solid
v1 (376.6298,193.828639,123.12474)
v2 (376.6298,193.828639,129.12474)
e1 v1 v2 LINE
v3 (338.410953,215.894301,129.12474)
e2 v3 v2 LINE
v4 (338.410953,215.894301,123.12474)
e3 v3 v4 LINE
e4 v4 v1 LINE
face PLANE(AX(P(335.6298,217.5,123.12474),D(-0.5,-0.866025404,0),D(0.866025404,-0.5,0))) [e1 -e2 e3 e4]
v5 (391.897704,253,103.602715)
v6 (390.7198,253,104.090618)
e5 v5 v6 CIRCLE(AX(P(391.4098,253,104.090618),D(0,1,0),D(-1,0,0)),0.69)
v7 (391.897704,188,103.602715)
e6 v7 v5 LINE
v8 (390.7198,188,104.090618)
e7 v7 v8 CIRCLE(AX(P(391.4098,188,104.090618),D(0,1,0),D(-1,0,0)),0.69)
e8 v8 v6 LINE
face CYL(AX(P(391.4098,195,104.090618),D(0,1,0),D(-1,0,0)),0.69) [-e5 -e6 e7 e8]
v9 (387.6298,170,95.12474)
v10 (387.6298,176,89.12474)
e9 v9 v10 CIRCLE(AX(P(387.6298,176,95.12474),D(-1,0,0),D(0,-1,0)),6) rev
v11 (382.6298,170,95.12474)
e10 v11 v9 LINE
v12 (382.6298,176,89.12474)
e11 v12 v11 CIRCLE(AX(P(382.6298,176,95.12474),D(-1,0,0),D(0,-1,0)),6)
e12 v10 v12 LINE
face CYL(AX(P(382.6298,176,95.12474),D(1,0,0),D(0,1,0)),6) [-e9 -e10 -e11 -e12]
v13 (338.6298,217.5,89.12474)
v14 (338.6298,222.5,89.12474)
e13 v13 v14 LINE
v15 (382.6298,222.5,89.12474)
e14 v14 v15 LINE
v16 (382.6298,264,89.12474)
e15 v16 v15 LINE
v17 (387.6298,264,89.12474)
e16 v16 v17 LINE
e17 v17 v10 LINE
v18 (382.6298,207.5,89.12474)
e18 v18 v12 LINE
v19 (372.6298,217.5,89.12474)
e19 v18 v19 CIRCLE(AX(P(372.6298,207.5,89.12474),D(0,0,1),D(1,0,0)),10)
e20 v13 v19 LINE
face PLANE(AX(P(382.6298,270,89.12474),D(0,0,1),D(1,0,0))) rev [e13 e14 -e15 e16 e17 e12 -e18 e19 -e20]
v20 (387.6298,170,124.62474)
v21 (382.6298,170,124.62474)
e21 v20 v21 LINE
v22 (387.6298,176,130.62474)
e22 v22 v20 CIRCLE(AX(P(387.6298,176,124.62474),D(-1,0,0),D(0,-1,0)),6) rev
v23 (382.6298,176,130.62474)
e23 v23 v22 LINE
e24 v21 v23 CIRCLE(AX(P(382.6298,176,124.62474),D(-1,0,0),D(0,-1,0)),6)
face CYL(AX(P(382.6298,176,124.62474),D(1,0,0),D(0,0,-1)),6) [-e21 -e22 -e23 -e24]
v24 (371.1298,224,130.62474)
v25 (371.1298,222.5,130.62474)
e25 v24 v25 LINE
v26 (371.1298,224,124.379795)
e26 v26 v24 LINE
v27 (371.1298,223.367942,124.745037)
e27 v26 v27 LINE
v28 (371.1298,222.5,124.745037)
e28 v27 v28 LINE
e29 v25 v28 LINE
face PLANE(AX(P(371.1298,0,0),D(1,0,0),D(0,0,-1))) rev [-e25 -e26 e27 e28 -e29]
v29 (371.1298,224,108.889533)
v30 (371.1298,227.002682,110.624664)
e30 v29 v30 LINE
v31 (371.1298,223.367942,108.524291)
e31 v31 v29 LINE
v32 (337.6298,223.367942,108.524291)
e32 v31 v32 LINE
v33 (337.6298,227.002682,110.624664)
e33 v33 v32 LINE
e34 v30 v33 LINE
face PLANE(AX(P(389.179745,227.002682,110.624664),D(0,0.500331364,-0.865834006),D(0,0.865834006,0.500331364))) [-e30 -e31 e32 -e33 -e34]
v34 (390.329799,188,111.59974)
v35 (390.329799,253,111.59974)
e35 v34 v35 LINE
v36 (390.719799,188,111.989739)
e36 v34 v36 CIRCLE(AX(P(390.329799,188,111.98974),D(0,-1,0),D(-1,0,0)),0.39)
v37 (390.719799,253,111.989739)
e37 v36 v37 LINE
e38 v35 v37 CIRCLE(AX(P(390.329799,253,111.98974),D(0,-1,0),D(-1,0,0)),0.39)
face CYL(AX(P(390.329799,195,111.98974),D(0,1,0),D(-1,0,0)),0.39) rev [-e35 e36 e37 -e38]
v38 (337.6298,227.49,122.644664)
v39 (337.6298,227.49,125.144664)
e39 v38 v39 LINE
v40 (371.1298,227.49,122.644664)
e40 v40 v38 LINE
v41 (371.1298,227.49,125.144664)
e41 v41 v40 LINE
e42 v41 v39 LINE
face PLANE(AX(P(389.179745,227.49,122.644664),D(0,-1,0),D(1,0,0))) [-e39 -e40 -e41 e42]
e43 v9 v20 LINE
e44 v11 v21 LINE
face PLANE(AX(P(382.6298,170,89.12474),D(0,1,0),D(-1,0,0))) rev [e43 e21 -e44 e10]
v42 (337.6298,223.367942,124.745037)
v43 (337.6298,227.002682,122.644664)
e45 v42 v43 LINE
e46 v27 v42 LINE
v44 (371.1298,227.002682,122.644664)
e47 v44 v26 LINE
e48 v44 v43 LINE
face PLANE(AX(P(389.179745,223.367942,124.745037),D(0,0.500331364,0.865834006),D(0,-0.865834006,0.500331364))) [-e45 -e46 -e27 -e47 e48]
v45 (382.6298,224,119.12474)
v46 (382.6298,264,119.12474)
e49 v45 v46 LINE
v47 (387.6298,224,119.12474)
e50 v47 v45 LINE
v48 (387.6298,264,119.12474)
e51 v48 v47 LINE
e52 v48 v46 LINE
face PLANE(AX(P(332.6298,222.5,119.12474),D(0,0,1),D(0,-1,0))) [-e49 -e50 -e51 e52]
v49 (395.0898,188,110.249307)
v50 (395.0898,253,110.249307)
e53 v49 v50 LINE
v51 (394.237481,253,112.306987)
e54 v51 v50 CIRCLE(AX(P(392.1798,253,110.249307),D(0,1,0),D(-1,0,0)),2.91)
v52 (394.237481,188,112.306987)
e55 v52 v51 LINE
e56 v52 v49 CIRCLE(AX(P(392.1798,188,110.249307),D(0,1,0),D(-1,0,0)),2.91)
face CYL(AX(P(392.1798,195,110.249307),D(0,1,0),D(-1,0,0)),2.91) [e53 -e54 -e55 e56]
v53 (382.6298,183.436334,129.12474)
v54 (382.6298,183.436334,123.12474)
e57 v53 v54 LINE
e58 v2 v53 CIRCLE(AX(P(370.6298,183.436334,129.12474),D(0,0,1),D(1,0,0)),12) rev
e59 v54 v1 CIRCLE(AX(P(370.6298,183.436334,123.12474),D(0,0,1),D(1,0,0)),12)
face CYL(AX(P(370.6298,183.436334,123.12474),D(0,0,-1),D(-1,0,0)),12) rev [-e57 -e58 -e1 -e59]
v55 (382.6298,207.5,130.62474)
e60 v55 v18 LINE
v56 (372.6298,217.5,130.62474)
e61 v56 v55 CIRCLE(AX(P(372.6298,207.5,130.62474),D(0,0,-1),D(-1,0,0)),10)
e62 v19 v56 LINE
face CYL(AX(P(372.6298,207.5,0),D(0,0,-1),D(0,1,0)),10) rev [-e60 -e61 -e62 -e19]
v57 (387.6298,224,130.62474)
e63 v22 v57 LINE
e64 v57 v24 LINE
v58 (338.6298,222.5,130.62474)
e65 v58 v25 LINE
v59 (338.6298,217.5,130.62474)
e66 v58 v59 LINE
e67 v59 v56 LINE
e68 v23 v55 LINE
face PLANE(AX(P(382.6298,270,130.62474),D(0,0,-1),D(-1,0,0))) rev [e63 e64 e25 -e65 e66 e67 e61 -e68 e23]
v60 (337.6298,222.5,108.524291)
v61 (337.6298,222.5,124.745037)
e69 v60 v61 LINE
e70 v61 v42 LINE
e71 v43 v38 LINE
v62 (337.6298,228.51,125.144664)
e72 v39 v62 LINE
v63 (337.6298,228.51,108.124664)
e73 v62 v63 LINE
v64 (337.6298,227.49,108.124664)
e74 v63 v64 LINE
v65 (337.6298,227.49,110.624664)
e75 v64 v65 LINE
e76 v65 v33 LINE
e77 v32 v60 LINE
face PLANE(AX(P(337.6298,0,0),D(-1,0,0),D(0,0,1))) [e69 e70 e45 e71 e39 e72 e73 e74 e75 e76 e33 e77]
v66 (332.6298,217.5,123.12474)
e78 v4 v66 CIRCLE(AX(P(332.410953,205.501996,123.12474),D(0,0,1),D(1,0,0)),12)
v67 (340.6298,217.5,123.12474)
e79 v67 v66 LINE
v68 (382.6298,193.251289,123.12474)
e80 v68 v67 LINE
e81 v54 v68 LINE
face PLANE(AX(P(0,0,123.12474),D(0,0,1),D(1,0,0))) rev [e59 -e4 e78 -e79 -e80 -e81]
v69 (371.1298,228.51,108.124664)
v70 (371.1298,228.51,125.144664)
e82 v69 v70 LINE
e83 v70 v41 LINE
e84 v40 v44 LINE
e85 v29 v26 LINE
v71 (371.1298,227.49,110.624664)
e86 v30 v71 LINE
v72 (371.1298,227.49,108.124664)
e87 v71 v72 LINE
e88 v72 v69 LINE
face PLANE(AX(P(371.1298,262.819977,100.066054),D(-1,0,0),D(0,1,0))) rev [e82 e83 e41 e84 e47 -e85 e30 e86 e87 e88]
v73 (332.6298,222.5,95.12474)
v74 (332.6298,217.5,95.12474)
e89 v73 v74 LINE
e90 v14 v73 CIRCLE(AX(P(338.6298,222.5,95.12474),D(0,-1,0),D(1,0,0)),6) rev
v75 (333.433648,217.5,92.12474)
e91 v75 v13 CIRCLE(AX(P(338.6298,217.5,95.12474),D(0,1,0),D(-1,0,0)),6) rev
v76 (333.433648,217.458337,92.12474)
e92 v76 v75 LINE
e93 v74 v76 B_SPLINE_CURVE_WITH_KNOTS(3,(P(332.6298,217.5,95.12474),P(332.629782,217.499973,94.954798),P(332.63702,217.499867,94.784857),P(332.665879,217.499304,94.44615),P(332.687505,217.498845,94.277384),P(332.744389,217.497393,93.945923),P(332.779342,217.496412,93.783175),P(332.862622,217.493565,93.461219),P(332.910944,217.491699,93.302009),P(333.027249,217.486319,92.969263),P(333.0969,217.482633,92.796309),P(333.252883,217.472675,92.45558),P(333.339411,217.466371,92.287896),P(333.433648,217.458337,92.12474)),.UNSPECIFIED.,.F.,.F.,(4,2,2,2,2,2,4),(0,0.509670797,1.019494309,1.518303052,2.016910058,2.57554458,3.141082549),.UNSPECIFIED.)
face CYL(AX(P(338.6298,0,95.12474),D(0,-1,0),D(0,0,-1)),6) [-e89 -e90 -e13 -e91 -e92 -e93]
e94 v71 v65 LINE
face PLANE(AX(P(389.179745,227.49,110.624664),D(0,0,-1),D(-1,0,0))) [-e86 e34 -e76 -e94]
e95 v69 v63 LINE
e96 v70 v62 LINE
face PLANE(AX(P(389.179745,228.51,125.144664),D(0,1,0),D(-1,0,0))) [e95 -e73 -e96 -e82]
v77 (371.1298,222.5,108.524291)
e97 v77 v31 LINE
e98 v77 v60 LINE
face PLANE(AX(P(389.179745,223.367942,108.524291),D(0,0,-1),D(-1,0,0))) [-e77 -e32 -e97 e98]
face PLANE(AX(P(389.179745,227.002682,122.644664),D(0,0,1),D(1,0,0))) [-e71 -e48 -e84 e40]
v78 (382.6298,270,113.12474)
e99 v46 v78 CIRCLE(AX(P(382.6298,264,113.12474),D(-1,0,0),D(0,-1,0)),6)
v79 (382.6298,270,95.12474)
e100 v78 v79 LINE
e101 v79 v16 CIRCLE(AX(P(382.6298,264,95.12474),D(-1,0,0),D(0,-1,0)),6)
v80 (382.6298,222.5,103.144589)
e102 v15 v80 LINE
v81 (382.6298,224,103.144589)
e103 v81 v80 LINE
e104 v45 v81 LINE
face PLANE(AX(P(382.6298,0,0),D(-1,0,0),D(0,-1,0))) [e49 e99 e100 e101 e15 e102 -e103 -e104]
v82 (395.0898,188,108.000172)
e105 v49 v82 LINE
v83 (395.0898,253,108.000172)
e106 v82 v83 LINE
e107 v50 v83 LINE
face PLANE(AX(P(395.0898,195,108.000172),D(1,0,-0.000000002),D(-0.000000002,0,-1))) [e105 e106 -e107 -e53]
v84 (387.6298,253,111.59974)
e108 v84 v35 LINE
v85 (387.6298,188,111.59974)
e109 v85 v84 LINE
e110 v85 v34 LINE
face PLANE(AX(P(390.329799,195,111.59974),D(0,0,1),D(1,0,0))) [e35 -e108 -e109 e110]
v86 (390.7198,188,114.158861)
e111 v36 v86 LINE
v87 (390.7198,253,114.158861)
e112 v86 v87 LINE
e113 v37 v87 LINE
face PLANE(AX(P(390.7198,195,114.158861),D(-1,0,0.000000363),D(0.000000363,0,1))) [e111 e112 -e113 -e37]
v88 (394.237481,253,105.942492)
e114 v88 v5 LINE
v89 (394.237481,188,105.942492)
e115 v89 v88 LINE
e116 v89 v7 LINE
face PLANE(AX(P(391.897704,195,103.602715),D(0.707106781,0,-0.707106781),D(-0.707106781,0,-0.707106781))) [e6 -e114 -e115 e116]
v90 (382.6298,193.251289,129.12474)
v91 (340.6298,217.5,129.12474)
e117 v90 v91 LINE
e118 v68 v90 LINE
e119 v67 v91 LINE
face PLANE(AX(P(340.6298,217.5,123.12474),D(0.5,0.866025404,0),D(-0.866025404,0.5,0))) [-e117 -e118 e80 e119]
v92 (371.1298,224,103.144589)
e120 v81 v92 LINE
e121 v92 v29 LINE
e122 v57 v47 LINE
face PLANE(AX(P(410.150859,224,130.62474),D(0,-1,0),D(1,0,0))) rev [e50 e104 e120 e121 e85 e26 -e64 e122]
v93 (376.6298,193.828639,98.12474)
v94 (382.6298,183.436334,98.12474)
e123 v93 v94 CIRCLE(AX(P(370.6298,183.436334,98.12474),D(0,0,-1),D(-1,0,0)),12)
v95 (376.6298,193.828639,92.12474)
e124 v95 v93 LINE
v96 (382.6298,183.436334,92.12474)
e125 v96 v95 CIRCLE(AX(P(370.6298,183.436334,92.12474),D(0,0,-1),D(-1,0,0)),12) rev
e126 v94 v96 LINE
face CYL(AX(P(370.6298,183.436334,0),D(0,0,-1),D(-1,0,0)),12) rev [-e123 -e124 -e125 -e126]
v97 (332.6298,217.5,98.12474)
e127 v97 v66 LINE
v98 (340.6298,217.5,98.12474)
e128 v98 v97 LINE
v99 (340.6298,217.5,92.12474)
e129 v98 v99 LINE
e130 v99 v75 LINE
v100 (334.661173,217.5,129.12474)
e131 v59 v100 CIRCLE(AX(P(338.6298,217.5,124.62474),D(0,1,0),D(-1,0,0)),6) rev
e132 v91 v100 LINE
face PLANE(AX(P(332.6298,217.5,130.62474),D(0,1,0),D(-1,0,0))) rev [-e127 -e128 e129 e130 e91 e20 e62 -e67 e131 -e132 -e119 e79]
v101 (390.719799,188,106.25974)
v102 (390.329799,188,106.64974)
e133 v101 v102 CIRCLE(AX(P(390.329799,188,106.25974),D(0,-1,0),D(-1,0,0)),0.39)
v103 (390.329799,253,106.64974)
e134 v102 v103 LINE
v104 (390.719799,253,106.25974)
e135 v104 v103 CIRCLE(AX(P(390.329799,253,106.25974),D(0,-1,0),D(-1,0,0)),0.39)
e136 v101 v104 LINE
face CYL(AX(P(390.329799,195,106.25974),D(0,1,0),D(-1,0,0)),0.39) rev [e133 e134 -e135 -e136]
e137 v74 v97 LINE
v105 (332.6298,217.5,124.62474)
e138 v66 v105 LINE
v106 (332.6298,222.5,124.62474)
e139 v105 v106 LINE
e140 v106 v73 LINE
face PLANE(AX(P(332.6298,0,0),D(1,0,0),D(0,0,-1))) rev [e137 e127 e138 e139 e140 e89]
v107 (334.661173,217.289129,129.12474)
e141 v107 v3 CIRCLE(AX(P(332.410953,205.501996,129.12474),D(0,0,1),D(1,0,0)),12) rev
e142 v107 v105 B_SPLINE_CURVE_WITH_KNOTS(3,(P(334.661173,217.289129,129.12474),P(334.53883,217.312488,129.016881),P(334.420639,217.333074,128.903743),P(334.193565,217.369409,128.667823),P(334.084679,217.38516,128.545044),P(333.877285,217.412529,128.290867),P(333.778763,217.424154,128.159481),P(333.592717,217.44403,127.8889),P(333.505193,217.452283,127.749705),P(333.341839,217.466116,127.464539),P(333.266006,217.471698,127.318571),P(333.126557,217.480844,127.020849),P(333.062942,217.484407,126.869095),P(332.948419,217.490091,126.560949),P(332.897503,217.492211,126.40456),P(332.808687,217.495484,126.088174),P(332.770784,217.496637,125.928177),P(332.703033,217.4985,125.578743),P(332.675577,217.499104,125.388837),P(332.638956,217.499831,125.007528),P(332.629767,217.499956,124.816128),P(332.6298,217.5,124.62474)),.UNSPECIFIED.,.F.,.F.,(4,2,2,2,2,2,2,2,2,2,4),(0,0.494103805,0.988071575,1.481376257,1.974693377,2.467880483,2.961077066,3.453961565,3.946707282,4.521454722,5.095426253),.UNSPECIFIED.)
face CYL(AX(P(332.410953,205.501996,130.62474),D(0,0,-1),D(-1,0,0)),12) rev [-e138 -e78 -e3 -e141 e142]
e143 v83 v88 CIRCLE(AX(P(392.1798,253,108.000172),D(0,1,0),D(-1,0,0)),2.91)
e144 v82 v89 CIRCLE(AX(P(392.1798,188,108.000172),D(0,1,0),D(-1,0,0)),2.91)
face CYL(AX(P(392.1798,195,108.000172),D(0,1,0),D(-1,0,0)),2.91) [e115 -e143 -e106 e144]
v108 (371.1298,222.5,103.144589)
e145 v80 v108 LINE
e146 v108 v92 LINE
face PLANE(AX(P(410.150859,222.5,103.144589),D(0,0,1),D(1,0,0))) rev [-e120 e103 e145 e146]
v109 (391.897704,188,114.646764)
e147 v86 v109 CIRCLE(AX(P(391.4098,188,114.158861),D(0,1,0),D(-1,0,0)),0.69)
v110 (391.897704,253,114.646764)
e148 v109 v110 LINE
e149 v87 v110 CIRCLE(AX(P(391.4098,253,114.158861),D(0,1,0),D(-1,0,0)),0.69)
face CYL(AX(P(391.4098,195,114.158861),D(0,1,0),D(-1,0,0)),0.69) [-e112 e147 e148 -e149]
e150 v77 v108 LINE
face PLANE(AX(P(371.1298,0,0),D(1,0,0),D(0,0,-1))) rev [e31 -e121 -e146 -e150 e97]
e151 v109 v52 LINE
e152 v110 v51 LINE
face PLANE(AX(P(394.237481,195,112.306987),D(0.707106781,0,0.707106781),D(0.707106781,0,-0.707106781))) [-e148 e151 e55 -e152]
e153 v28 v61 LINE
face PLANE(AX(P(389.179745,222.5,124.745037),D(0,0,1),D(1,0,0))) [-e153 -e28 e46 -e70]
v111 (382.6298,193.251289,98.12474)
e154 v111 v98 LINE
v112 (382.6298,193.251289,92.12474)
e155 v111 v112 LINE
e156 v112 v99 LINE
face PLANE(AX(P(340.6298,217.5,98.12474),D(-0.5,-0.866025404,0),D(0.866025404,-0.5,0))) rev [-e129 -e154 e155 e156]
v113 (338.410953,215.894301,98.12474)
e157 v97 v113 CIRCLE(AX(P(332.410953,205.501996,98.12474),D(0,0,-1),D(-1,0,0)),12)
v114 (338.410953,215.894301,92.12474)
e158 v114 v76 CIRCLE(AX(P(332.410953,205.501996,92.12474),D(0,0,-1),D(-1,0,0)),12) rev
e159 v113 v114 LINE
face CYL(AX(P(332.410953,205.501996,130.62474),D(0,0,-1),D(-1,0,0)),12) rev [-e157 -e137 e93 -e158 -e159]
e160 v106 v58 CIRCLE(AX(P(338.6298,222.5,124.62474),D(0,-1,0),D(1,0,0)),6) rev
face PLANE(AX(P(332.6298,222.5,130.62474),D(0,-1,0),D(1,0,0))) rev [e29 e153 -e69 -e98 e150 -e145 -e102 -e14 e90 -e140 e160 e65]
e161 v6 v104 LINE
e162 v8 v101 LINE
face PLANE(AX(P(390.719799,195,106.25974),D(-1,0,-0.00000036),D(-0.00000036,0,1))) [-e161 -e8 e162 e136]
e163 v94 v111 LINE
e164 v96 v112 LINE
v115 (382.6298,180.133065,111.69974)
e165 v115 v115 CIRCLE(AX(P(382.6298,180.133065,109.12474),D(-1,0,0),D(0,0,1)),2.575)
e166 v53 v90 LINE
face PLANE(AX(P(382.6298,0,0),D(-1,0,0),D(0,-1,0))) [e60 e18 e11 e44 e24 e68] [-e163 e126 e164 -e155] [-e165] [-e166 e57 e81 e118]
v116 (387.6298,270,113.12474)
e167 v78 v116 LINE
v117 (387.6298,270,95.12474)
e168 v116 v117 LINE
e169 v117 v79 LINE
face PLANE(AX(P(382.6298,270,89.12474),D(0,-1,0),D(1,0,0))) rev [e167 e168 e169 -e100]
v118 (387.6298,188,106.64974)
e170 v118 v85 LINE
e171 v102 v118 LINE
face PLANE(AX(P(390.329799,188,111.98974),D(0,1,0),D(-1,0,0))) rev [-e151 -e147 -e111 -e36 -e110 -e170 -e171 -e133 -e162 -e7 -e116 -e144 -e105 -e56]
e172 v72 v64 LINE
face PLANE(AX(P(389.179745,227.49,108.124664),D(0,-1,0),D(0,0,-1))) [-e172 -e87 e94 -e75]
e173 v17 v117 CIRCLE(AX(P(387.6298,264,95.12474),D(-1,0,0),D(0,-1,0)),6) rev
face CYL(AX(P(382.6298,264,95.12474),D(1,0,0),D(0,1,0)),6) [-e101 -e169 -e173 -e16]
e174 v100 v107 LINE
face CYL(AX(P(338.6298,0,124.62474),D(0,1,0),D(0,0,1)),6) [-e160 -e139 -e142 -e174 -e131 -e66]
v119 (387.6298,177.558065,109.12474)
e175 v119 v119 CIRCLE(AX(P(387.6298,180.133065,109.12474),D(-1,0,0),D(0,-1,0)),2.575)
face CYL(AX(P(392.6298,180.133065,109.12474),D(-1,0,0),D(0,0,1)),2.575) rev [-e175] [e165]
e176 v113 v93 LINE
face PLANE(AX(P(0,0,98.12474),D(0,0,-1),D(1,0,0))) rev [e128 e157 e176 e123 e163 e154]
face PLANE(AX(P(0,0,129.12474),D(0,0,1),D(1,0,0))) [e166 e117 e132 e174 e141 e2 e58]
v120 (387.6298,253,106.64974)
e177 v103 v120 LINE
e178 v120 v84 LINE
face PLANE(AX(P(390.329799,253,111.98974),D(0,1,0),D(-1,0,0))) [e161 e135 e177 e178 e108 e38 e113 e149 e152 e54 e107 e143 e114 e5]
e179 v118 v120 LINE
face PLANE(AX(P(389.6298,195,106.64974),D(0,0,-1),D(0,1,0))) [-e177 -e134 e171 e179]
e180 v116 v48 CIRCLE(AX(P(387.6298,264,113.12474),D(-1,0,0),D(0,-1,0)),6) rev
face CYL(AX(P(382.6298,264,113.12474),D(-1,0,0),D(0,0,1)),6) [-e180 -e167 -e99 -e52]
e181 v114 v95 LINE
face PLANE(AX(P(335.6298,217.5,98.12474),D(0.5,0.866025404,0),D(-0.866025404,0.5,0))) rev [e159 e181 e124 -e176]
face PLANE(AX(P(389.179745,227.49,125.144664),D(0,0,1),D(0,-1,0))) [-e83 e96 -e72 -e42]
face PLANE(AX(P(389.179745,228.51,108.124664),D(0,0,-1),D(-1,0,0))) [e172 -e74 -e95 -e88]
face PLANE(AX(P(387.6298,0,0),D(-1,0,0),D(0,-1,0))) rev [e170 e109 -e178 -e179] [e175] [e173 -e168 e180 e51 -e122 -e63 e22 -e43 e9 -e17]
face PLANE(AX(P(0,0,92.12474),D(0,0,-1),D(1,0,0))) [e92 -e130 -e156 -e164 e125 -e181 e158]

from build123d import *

# Parameters (mm, degrees)
BOSS_EXTRUDE5_DEPTH  = 50
SKETCH11_W           = 41.5
SKETCH11_H           = 100
BOSS_EXTRUDE6_DEPTH  = 5
SKETCH12_W           = 41.5
SKETCH12_H           = 5
BOSS_EXTRUDE8_DEPTH  = 55
SKETCH13_W           = 11.5
SKETCH13_H           = 47.5
CUT_EXTRUDE1_DEPTH   = 55
BOSS_EXTRUDE9_DEPTH  = 6
FILLET7_R            = 12
FILLET7_OF_MIRROR1_R = 12
FILLET8_R            = 6
BOSS_EXTRUDE10_START = 8
BOSS_EXTRUDE10_DEPTH = 8
FILLET12_R           = 10
BOSS_EXTRUDE11_DEPTH = 57
SKETCH16_R           = 2.575
CUT_EXTRUDE2_DEPTH   = 10
SKETCH17_W           = 27.480150942
SKETCH17_H           = 1.5
BOSS_EXTRUDE12_DEPTH = 11.5
SKETCH18_W           = 11.5
SKETCH18_H           = 1.5
BOSS_EXTRUDE13_DEPTH = 5
BOSS_EXTRUDE14_START = -5
BOSS_EXTRUDE14_DEPTH = 33.5


with BuildPart() as part:
    # Sketch9 → Boss-Extrude5 (new body)
    with BuildSketch(Plane(origin=(0, 245, 0), x_dir=(1, 0, 0), z_dir=(0, 1, 0))):
        with BuildLine():
            Line((389.629800237, -111.599739584), (387.629800237, -111.599739584))
            Line((387.629800237, -111.599739584), (387.629800237, -106.649739584))
            Line((387.629800237, -106.649739584), (389.629800237, -106.649739584))
            Line((389.629800237, -106.649739584), (390.329799474, -106.649739584))
            ThreePointArc((390.329799474, -106.649739584), (390.605571069, -106.535511279), (390.719799474, -106.259739725))
            Line((390.719799474, -106.259739725), (390.719800256, -104.090618139))
            ThreePointArc((390.719800256, -104.090618139), (391.145748802, -103.453141463), (391.897703935, -103.602714709))
            Line((391.897703935, -103.602714709), (394.237480965, -105.942491739))
            ThreePointArc((394.237480965, -105.942491739), (394.868289671, -106.886563682), (395.089800232, -108.000172467))
            Line((395.089800232, -108.000172467), (395.089800237, -110.249306685))
            ThreePointArc((395.089800237, -110.249306685), (394.868289678, -111.362915477), (394.23748097, -112.306987424))
            Line((394.23748097, -112.306987424), (391.897703941, -114.646764454))
            ThreePointArc((391.897703941, -114.646764454), (391.145748809, -114.7963377), (390.719800262, -114.158861025))
            Line((390.719800262, -114.158861025), (390.719799474, -111.989739443))
            ThreePointArc((390.719799474, -111.989739443), (390.605571069, -111.71396789), (390.329799474, -111.599739584))
            Line((390.329799474, -111.599739584), (389.629800237, -111.599739584))
        make_face()
    extrude(amount=-BOSS_EXTRUDE5_DEPTH)

    # Sketch11 → Boss-Extrude6 (add)
    with BuildSketch(Plane.ZY.offset(-387.629800242)):
        with Locations((109.874739584, 220)):
            Rectangle(SKETCH11_W, SKETCH11_H)
    extrude(amount=BOSS_EXTRUDE6_DEPTH)

    # Sketch12 → Boss-Extrude8 (add)
    with BuildSketch(Plane.ZY.offset(-387.629800242)):
        with Locations((109.874739584, 220)):
            Rectangle(SKETCH12_W, SKETCH12_H)
    extrude(amount=BOSS_EXTRUDE8_DEPTH)

    # Sketch13 → Cut-Extrude1 (cut)
    with BuildSketch(Plane.ZY.offset(-387.629800242)):
        with Locations((124.874739584, 246.25)):
            Rectangle(SKETCH13_W, SKETCH13_H)
    extrude(amount=CUT_EXTRUDE1_DEPTH, mode=Mode.SUBTRACT)

    # Sketch15 → Boss-Extrude9 (add)
    with BuildSketch(Plane.XY.offset(129.124739584)):
        Polygon((335.629800242, 217.5), (382.629800242, 190.364537348), (382.629800242, 193.251288694), (340.629800242, 217.5), align=None)
    boss_extrude9 = extrude(amount=-BOSS_EXTRUDE9_DEPTH)

    # Fillet7
    # the kernel refuses this fillet: 12 mm, written as the material it adds along each edge
    with BuildSketch(Plane(origin=(335.629800242, 217.5, 129.124739584), x_dir=(-1, 0, 0), z_dir=(0, 0, -1))) as fillet7_piece_1:
        with BuildLine():
            CenterArc((3.218847051, -11.998004249), FILLET7_R, 91.044975628, 28.955024372)
            Line((-2.781152949, -1.605699404), (-2.901152949, -1.397853307))
            Line((-2.901152949, -1.397853307), (-0.12, 0.207846097))
            Line((-0.12, 0.207846097), (0, 0.24))
            ThreePointArc((0, 0.24), (1.5, 0.24), (2.995623059, 0.239960085))
            Line((2.995623059, 0.239960085), (3, 0))
        make_face()
    extrude(amount=6)
    with BuildSketch(Plane(origin=(382.629800242, 190.364537348, 129.124739584), x_dir=(0, -1, 0), z_dir=(0, 0, -1))) as fillet7_piece_2:
        with BuildLine():
            CenterArc((FILLET7_R * 0.57735026919, FILLET7_R), FILLET7_R, 210, 60)
            Line((-FILLET7_R * 0.288675134595, FILLET7_R * 0.5), (-FILLET7_R * 0.305995642671, FILLET7_R * 0.49))
            Line((-FILLET7_R * 0.305995642671, FILLET7_R * 0.49), (-FILLET7_R * 0.0115470053838, -FILLET7_R * 0.02))
            Line((-FILLET7_R * 0.0115470053838, -FILLET7_R * 0.02), (FILLET7_R * 0.57735026919, -FILLET7_R * 0.02))
            Line((FILLET7_R * 0.57735026919, -FILLET7_R * 0.02), (FILLET7_R * 0.57735026919, 0))
        make_face()
    extrude(amount=6)

    # Mirror1: Boss-Extrude9 across plane
    add(boss_extrude9.mirror(Plane.XY.offset(110.624739584)))

    # Fillet7 of Mirror1
    # the kernel refuses this fillet: 12 mm, written as the material it adds along each edge
    with BuildSketch(Plane(origin=(335.629800242, 217.5, 92.124739584), x_dir=(-1, 0, 0), z_dir=(0, 0, 1))) as fillet7_of_mirror1_piece_1:
        with BuildLine():
            CenterArc((3.218847051, 11.998004249), FILLET7_OF_MIRROR1_R, 240, 28.955024372)
            Line((-2.781152949, 1.605699404), (-2.901152949, 1.397853307))
            Line((-2.901152949, 1.397853307), (-0.12, -0.207846097))
            Line((-0.12, -0.207846097), (0, -0.24))
            ThreePointArc((0, -0.24), (1.5, -0.24), (2.995623059, -0.239960085))
            Line((2.995623059, -0.239960085), (3, 0))
        make_face()
    extrude(amount=6)
    with BuildSketch(Plane(origin=(382.629800242, 190.364537348, 92.124739584), x_dir=(0, -1, 0), z_dir=(0, 0, 1))) as fillet7_of_mirror1_piece_2:
        with BuildLine():
            CenterArc((FILLET7_OF_MIRROR1_R * 0.57735026919, -FILLET7_OF_MIRROR1_R), FILLET7_OF_MIRROR1_R, 90, 60)
            Line((-FILLET7_OF_MIRROR1_R * 0.288675134595, -FILLET7_OF_MIRROR1_R * 0.5), (-FILLET7_OF_MIRROR1_R * 0.305995642671, -FILLET7_OF_MIRROR1_R * 0.49))
            Line((-FILLET7_OF_MIRROR1_R * 0.305995642671, -FILLET7_OF_MIRROR1_R * 0.49), (-FILLET7_OF_MIRROR1_R * 0.0115470053838, FILLET7_OF_MIRROR1_R * 0.02))
            Line((-FILLET7_OF_MIRROR1_R * 0.0115470053838, FILLET7_OF_MIRROR1_R * 0.02), (FILLET7_OF_MIRROR1_R * 0.57735026919, FILLET7_OF_MIRROR1_R * 0.02))
            Line((FILLET7_OF_MIRROR1_R * 0.57735026919, FILLET7_OF_MIRROR1_R * 0.02), (FILLET7_OF_MIRROR1_R * 0.57735026919, 0))
        make_face()
    extrude(amount=6)

    # Fillet8
    # the kernel refuses this fillet: 6 mm, written as the material it takes off along each edge
    with BuildSketch(Plane(origin=(402.629800242, 270, 89.124739584), x_dir=(0, 0, 1), z_dir=(-1, 0, 0)), Plane(origin=(332.629800242, 237.5, 89.124739584), x_dir=(0, 0, 1), z_dir=(0, -1, 0)), Plane(origin=(402.629800242, 270, 119.124739584), x_dir=(0, -1, 0), z_dir=(-1, 0, 0))) as fillet8_piece_1:
        with BuildLine():
            CenterArc((FILLET8_R, -FILLET8_R), FILLET8_R, 90, 90)
            Line((0, -FILLET8_R), (0, 0))
            Line((0, 0), (FILLET8_R, 0))
        make_face()
    extrude(amount=35, mode=Mode.SUBTRACT)
    with BuildSketch(Plane(origin=(402.629800242, 170, 89.124739584), x_dir=(0, 0, 1), z_dir=(-1, 0, 0)), Plane(origin=(402.629800242, 170, 130.624739584), x_dir=(0, 1, 0), z_dir=(-1, 0, 0)), Plane(origin=(332.629800242, 202.5, 130.624739584), x_dir=(1, 0, 0), z_dir=(0, 1, 0))) as fillet8_piece_2:
        with BuildLine():
            CenterArc((FILLET8_R, FILLET8_R), FILLET8_R, 180, 90)
            Line((0, FILLET8_R), (0, 0))
            Line((0, 0), (FILLET8_R, 0))
        make_face()
    extrude(amount=35, mode=Mode.SUBTRACT)

    # Sketch9<2> → Boss-Extrude10 (add)
    with BuildSketch(Plane(origin=(0, 245, 0), x_dir=(1, 0, 0), z_dir=(0, 1, 0)).offset(BOSS_EXTRUDE10_START)):
        with BuildLine():
            Line((389.629800237, -111.599739584), (387.629800237, -111.599739584))
            Line((387.629800237, -111.599739584), (387.629800237, -106.649739584))
            Line((387.629800237, -106.649739584), (389.629800237, -106.649739584))
            Line((389.629800237, -106.649739584), (390.329799474, -106.649739584))
            ThreePointArc((390.329799474, -106.649739584), (390.605571069, -106.535511279), (390.719799474, -106.259739725))
            Line((390.719799474, -106.259739725), (390.719800256, -104.090618139))
            ThreePointArc((390.719800256, -104.090618139), (391.145748802, -103.453141463), (391.897703935, -103.602714709))
            Line((391.897703935, -103.602714709), (394.237480965, -105.942491739))
            ThreePointArc((394.237480965, -105.942491739), (394.868289671, -106.886563682), (395.089800232, -108.000172467))
            Line((395.089800232, -108.000172467), (395.089800237, -110.249306685))
            ThreePointArc((395.089800237, -110.249306685), (394.868289678, -111.362915477), (394.23748097, -112.306987424))
            Line((394.23748097, -112.306987424), (391.897703941, -114.646764454))
            ThreePointArc((391.897703941, -114.646764454), (391.145748809, -114.7963377), (390.719800262, -114.158861025))
            Line((390.719800262, -114.158861025), (390.719799474, -111.989739443))
            ThreePointArc((390.719799474, -111.989739443), (390.605571069, -111.71396789), (390.329799474, -111.599739584))
            Line((390.329799474, -111.599739584), (389.629800237, -111.599739584))
        make_face()
    extrude(amount=-BOSS_EXTRUDE10_DEPTH)

    # Fillet12
    fillet12_edges = [part.edges().sort_by_distance(p)[0] for p in [
        (382.629800242, 217.5, 109.874739584),
    ]]
    fillet(fillet12_edges, radius=FILLET12_R)

    # Sketch9<3> → Boss-Extrude11 (add)
    with BuildSketch(Plane(origin=(0, 245, 0), x_dir=(1, 0, 0), z_dir=(0, 1, 0))):
        with BuildLine():
            Line((389.629800237, -111.599739584), (387.629800237, -111.599739584))
            Line((387.629800237, -111.599739584), (387.629800237, -106.649739584))
            Line((387.629800237, -106.649739584), (389.629800237, -106.649739584))
            Line((389.629800237, -106.649739584), (390.329799474, -106.649739584))
            ThreePointArc((390.329799474, -106.649739584), (390.605571069, -106.535511279), (390.719799474, -106.259739725))
            Line((390.719799474, -106.259739725), (390.719800256, -104.090618139))
            ThreePointArc((390.719800256, -104.090618139), (391.145748802, -103.453141463), (391.897703935, -103.602714709))
            Line((391.897703935, -103.602714709), (394.237480965, -105.942491739))
            ThreePointArc((394.237480965, -105.942491739), (394.868289671, -106.886563682), (395.089800232, -108.000172467))
            Line((395.089800232, -108.000172467), (395.089800237, -110.249306685))
            ThreePointArc((395.089800237, -110.249306685), (394.868289678, -111.362915477), (394.23748097, -112.306987424))
            Line((394.23748097, -112.306987424), (391.897703941, -114.646764454))
            ThreePointArc((391.897703941, -114.646764454), (391.145748809, -114.7963377), (390.719800262, -114.158861025))
            Line((390.719800262, -114.158861025), (390.719799474, -111.989739443))
            ThreePointArc((390.719799474, -111.989739443), (390.605571069, -111.71396789), (390.329799474, -111.599739584))
            Line((390.329799474, -111.599739584), (389.629800237, -111.599739584))
        make_face()
    extrude(amount=-BOSS_EXTRUDE11_DEPTH)

    # Sketch16 → Cut-Extrude2 (cut)
    with BuildSketch(Plane.ZY.offset(-382.629800242)):
        with Locations((109.124739584, 180.133064736)):
            Circle(SKETCH16_R)
    extrude(amount=-CUT_EXTRUDE2_DEPTH, mode=Mode.SUBTRACT)

    # Sketch17 → Boss-Extrude12 (add)
    with BuildSketch(Plane(origin=(371.129800242, 0, 0), x_dir=(0, 0, -1), z_dir=(1, 0, 0))):
        with Locations((-116.884664113, 223.25)):
            Rectangle(SKETCH17_W, SKETCH17_H)
    extrude(amount=BOSS_EXTRUDE12_DEPTH)

    # Sketch18 → Boss-Extrude13 (add)
    with BuildSketch(Plane(origin=(382.629800242, 0, 0), x_dir=(0, 0, -1), z_dir=(1, 0, 0))):
        with Locations((-124.874739584, 223.25)):
            Rectangle(SKETCH18_W, SKETCH18_H)
    extrude(amount=BOSS_EXTRUDE13_DEPTH)

    # Sketch19 → Boss-Extrude14 (add)
    with BuildSketch(Plane.ZY.offset(-332.629800242).offset(BOSS_EXTRUDE14_START)):
        Polygon((125.144664113, 227.49), (125.144664113, 228.51), (108.124664113, 228.51), (108.124664113, 227.49), (110.624664113, 227.49), (110.624664113, 227.002681543), (108.524291386, 223.367942117), (108.524291386, 222.5), (124.745036841, 222.5), (124.745036841, 223.367942117), (122.644664113, 227.002681543), (122.644664113, 227.49), align=None)
    extrude(amount=-BOSS_EXTRUDE14_DEPTH)


solid = part.part
